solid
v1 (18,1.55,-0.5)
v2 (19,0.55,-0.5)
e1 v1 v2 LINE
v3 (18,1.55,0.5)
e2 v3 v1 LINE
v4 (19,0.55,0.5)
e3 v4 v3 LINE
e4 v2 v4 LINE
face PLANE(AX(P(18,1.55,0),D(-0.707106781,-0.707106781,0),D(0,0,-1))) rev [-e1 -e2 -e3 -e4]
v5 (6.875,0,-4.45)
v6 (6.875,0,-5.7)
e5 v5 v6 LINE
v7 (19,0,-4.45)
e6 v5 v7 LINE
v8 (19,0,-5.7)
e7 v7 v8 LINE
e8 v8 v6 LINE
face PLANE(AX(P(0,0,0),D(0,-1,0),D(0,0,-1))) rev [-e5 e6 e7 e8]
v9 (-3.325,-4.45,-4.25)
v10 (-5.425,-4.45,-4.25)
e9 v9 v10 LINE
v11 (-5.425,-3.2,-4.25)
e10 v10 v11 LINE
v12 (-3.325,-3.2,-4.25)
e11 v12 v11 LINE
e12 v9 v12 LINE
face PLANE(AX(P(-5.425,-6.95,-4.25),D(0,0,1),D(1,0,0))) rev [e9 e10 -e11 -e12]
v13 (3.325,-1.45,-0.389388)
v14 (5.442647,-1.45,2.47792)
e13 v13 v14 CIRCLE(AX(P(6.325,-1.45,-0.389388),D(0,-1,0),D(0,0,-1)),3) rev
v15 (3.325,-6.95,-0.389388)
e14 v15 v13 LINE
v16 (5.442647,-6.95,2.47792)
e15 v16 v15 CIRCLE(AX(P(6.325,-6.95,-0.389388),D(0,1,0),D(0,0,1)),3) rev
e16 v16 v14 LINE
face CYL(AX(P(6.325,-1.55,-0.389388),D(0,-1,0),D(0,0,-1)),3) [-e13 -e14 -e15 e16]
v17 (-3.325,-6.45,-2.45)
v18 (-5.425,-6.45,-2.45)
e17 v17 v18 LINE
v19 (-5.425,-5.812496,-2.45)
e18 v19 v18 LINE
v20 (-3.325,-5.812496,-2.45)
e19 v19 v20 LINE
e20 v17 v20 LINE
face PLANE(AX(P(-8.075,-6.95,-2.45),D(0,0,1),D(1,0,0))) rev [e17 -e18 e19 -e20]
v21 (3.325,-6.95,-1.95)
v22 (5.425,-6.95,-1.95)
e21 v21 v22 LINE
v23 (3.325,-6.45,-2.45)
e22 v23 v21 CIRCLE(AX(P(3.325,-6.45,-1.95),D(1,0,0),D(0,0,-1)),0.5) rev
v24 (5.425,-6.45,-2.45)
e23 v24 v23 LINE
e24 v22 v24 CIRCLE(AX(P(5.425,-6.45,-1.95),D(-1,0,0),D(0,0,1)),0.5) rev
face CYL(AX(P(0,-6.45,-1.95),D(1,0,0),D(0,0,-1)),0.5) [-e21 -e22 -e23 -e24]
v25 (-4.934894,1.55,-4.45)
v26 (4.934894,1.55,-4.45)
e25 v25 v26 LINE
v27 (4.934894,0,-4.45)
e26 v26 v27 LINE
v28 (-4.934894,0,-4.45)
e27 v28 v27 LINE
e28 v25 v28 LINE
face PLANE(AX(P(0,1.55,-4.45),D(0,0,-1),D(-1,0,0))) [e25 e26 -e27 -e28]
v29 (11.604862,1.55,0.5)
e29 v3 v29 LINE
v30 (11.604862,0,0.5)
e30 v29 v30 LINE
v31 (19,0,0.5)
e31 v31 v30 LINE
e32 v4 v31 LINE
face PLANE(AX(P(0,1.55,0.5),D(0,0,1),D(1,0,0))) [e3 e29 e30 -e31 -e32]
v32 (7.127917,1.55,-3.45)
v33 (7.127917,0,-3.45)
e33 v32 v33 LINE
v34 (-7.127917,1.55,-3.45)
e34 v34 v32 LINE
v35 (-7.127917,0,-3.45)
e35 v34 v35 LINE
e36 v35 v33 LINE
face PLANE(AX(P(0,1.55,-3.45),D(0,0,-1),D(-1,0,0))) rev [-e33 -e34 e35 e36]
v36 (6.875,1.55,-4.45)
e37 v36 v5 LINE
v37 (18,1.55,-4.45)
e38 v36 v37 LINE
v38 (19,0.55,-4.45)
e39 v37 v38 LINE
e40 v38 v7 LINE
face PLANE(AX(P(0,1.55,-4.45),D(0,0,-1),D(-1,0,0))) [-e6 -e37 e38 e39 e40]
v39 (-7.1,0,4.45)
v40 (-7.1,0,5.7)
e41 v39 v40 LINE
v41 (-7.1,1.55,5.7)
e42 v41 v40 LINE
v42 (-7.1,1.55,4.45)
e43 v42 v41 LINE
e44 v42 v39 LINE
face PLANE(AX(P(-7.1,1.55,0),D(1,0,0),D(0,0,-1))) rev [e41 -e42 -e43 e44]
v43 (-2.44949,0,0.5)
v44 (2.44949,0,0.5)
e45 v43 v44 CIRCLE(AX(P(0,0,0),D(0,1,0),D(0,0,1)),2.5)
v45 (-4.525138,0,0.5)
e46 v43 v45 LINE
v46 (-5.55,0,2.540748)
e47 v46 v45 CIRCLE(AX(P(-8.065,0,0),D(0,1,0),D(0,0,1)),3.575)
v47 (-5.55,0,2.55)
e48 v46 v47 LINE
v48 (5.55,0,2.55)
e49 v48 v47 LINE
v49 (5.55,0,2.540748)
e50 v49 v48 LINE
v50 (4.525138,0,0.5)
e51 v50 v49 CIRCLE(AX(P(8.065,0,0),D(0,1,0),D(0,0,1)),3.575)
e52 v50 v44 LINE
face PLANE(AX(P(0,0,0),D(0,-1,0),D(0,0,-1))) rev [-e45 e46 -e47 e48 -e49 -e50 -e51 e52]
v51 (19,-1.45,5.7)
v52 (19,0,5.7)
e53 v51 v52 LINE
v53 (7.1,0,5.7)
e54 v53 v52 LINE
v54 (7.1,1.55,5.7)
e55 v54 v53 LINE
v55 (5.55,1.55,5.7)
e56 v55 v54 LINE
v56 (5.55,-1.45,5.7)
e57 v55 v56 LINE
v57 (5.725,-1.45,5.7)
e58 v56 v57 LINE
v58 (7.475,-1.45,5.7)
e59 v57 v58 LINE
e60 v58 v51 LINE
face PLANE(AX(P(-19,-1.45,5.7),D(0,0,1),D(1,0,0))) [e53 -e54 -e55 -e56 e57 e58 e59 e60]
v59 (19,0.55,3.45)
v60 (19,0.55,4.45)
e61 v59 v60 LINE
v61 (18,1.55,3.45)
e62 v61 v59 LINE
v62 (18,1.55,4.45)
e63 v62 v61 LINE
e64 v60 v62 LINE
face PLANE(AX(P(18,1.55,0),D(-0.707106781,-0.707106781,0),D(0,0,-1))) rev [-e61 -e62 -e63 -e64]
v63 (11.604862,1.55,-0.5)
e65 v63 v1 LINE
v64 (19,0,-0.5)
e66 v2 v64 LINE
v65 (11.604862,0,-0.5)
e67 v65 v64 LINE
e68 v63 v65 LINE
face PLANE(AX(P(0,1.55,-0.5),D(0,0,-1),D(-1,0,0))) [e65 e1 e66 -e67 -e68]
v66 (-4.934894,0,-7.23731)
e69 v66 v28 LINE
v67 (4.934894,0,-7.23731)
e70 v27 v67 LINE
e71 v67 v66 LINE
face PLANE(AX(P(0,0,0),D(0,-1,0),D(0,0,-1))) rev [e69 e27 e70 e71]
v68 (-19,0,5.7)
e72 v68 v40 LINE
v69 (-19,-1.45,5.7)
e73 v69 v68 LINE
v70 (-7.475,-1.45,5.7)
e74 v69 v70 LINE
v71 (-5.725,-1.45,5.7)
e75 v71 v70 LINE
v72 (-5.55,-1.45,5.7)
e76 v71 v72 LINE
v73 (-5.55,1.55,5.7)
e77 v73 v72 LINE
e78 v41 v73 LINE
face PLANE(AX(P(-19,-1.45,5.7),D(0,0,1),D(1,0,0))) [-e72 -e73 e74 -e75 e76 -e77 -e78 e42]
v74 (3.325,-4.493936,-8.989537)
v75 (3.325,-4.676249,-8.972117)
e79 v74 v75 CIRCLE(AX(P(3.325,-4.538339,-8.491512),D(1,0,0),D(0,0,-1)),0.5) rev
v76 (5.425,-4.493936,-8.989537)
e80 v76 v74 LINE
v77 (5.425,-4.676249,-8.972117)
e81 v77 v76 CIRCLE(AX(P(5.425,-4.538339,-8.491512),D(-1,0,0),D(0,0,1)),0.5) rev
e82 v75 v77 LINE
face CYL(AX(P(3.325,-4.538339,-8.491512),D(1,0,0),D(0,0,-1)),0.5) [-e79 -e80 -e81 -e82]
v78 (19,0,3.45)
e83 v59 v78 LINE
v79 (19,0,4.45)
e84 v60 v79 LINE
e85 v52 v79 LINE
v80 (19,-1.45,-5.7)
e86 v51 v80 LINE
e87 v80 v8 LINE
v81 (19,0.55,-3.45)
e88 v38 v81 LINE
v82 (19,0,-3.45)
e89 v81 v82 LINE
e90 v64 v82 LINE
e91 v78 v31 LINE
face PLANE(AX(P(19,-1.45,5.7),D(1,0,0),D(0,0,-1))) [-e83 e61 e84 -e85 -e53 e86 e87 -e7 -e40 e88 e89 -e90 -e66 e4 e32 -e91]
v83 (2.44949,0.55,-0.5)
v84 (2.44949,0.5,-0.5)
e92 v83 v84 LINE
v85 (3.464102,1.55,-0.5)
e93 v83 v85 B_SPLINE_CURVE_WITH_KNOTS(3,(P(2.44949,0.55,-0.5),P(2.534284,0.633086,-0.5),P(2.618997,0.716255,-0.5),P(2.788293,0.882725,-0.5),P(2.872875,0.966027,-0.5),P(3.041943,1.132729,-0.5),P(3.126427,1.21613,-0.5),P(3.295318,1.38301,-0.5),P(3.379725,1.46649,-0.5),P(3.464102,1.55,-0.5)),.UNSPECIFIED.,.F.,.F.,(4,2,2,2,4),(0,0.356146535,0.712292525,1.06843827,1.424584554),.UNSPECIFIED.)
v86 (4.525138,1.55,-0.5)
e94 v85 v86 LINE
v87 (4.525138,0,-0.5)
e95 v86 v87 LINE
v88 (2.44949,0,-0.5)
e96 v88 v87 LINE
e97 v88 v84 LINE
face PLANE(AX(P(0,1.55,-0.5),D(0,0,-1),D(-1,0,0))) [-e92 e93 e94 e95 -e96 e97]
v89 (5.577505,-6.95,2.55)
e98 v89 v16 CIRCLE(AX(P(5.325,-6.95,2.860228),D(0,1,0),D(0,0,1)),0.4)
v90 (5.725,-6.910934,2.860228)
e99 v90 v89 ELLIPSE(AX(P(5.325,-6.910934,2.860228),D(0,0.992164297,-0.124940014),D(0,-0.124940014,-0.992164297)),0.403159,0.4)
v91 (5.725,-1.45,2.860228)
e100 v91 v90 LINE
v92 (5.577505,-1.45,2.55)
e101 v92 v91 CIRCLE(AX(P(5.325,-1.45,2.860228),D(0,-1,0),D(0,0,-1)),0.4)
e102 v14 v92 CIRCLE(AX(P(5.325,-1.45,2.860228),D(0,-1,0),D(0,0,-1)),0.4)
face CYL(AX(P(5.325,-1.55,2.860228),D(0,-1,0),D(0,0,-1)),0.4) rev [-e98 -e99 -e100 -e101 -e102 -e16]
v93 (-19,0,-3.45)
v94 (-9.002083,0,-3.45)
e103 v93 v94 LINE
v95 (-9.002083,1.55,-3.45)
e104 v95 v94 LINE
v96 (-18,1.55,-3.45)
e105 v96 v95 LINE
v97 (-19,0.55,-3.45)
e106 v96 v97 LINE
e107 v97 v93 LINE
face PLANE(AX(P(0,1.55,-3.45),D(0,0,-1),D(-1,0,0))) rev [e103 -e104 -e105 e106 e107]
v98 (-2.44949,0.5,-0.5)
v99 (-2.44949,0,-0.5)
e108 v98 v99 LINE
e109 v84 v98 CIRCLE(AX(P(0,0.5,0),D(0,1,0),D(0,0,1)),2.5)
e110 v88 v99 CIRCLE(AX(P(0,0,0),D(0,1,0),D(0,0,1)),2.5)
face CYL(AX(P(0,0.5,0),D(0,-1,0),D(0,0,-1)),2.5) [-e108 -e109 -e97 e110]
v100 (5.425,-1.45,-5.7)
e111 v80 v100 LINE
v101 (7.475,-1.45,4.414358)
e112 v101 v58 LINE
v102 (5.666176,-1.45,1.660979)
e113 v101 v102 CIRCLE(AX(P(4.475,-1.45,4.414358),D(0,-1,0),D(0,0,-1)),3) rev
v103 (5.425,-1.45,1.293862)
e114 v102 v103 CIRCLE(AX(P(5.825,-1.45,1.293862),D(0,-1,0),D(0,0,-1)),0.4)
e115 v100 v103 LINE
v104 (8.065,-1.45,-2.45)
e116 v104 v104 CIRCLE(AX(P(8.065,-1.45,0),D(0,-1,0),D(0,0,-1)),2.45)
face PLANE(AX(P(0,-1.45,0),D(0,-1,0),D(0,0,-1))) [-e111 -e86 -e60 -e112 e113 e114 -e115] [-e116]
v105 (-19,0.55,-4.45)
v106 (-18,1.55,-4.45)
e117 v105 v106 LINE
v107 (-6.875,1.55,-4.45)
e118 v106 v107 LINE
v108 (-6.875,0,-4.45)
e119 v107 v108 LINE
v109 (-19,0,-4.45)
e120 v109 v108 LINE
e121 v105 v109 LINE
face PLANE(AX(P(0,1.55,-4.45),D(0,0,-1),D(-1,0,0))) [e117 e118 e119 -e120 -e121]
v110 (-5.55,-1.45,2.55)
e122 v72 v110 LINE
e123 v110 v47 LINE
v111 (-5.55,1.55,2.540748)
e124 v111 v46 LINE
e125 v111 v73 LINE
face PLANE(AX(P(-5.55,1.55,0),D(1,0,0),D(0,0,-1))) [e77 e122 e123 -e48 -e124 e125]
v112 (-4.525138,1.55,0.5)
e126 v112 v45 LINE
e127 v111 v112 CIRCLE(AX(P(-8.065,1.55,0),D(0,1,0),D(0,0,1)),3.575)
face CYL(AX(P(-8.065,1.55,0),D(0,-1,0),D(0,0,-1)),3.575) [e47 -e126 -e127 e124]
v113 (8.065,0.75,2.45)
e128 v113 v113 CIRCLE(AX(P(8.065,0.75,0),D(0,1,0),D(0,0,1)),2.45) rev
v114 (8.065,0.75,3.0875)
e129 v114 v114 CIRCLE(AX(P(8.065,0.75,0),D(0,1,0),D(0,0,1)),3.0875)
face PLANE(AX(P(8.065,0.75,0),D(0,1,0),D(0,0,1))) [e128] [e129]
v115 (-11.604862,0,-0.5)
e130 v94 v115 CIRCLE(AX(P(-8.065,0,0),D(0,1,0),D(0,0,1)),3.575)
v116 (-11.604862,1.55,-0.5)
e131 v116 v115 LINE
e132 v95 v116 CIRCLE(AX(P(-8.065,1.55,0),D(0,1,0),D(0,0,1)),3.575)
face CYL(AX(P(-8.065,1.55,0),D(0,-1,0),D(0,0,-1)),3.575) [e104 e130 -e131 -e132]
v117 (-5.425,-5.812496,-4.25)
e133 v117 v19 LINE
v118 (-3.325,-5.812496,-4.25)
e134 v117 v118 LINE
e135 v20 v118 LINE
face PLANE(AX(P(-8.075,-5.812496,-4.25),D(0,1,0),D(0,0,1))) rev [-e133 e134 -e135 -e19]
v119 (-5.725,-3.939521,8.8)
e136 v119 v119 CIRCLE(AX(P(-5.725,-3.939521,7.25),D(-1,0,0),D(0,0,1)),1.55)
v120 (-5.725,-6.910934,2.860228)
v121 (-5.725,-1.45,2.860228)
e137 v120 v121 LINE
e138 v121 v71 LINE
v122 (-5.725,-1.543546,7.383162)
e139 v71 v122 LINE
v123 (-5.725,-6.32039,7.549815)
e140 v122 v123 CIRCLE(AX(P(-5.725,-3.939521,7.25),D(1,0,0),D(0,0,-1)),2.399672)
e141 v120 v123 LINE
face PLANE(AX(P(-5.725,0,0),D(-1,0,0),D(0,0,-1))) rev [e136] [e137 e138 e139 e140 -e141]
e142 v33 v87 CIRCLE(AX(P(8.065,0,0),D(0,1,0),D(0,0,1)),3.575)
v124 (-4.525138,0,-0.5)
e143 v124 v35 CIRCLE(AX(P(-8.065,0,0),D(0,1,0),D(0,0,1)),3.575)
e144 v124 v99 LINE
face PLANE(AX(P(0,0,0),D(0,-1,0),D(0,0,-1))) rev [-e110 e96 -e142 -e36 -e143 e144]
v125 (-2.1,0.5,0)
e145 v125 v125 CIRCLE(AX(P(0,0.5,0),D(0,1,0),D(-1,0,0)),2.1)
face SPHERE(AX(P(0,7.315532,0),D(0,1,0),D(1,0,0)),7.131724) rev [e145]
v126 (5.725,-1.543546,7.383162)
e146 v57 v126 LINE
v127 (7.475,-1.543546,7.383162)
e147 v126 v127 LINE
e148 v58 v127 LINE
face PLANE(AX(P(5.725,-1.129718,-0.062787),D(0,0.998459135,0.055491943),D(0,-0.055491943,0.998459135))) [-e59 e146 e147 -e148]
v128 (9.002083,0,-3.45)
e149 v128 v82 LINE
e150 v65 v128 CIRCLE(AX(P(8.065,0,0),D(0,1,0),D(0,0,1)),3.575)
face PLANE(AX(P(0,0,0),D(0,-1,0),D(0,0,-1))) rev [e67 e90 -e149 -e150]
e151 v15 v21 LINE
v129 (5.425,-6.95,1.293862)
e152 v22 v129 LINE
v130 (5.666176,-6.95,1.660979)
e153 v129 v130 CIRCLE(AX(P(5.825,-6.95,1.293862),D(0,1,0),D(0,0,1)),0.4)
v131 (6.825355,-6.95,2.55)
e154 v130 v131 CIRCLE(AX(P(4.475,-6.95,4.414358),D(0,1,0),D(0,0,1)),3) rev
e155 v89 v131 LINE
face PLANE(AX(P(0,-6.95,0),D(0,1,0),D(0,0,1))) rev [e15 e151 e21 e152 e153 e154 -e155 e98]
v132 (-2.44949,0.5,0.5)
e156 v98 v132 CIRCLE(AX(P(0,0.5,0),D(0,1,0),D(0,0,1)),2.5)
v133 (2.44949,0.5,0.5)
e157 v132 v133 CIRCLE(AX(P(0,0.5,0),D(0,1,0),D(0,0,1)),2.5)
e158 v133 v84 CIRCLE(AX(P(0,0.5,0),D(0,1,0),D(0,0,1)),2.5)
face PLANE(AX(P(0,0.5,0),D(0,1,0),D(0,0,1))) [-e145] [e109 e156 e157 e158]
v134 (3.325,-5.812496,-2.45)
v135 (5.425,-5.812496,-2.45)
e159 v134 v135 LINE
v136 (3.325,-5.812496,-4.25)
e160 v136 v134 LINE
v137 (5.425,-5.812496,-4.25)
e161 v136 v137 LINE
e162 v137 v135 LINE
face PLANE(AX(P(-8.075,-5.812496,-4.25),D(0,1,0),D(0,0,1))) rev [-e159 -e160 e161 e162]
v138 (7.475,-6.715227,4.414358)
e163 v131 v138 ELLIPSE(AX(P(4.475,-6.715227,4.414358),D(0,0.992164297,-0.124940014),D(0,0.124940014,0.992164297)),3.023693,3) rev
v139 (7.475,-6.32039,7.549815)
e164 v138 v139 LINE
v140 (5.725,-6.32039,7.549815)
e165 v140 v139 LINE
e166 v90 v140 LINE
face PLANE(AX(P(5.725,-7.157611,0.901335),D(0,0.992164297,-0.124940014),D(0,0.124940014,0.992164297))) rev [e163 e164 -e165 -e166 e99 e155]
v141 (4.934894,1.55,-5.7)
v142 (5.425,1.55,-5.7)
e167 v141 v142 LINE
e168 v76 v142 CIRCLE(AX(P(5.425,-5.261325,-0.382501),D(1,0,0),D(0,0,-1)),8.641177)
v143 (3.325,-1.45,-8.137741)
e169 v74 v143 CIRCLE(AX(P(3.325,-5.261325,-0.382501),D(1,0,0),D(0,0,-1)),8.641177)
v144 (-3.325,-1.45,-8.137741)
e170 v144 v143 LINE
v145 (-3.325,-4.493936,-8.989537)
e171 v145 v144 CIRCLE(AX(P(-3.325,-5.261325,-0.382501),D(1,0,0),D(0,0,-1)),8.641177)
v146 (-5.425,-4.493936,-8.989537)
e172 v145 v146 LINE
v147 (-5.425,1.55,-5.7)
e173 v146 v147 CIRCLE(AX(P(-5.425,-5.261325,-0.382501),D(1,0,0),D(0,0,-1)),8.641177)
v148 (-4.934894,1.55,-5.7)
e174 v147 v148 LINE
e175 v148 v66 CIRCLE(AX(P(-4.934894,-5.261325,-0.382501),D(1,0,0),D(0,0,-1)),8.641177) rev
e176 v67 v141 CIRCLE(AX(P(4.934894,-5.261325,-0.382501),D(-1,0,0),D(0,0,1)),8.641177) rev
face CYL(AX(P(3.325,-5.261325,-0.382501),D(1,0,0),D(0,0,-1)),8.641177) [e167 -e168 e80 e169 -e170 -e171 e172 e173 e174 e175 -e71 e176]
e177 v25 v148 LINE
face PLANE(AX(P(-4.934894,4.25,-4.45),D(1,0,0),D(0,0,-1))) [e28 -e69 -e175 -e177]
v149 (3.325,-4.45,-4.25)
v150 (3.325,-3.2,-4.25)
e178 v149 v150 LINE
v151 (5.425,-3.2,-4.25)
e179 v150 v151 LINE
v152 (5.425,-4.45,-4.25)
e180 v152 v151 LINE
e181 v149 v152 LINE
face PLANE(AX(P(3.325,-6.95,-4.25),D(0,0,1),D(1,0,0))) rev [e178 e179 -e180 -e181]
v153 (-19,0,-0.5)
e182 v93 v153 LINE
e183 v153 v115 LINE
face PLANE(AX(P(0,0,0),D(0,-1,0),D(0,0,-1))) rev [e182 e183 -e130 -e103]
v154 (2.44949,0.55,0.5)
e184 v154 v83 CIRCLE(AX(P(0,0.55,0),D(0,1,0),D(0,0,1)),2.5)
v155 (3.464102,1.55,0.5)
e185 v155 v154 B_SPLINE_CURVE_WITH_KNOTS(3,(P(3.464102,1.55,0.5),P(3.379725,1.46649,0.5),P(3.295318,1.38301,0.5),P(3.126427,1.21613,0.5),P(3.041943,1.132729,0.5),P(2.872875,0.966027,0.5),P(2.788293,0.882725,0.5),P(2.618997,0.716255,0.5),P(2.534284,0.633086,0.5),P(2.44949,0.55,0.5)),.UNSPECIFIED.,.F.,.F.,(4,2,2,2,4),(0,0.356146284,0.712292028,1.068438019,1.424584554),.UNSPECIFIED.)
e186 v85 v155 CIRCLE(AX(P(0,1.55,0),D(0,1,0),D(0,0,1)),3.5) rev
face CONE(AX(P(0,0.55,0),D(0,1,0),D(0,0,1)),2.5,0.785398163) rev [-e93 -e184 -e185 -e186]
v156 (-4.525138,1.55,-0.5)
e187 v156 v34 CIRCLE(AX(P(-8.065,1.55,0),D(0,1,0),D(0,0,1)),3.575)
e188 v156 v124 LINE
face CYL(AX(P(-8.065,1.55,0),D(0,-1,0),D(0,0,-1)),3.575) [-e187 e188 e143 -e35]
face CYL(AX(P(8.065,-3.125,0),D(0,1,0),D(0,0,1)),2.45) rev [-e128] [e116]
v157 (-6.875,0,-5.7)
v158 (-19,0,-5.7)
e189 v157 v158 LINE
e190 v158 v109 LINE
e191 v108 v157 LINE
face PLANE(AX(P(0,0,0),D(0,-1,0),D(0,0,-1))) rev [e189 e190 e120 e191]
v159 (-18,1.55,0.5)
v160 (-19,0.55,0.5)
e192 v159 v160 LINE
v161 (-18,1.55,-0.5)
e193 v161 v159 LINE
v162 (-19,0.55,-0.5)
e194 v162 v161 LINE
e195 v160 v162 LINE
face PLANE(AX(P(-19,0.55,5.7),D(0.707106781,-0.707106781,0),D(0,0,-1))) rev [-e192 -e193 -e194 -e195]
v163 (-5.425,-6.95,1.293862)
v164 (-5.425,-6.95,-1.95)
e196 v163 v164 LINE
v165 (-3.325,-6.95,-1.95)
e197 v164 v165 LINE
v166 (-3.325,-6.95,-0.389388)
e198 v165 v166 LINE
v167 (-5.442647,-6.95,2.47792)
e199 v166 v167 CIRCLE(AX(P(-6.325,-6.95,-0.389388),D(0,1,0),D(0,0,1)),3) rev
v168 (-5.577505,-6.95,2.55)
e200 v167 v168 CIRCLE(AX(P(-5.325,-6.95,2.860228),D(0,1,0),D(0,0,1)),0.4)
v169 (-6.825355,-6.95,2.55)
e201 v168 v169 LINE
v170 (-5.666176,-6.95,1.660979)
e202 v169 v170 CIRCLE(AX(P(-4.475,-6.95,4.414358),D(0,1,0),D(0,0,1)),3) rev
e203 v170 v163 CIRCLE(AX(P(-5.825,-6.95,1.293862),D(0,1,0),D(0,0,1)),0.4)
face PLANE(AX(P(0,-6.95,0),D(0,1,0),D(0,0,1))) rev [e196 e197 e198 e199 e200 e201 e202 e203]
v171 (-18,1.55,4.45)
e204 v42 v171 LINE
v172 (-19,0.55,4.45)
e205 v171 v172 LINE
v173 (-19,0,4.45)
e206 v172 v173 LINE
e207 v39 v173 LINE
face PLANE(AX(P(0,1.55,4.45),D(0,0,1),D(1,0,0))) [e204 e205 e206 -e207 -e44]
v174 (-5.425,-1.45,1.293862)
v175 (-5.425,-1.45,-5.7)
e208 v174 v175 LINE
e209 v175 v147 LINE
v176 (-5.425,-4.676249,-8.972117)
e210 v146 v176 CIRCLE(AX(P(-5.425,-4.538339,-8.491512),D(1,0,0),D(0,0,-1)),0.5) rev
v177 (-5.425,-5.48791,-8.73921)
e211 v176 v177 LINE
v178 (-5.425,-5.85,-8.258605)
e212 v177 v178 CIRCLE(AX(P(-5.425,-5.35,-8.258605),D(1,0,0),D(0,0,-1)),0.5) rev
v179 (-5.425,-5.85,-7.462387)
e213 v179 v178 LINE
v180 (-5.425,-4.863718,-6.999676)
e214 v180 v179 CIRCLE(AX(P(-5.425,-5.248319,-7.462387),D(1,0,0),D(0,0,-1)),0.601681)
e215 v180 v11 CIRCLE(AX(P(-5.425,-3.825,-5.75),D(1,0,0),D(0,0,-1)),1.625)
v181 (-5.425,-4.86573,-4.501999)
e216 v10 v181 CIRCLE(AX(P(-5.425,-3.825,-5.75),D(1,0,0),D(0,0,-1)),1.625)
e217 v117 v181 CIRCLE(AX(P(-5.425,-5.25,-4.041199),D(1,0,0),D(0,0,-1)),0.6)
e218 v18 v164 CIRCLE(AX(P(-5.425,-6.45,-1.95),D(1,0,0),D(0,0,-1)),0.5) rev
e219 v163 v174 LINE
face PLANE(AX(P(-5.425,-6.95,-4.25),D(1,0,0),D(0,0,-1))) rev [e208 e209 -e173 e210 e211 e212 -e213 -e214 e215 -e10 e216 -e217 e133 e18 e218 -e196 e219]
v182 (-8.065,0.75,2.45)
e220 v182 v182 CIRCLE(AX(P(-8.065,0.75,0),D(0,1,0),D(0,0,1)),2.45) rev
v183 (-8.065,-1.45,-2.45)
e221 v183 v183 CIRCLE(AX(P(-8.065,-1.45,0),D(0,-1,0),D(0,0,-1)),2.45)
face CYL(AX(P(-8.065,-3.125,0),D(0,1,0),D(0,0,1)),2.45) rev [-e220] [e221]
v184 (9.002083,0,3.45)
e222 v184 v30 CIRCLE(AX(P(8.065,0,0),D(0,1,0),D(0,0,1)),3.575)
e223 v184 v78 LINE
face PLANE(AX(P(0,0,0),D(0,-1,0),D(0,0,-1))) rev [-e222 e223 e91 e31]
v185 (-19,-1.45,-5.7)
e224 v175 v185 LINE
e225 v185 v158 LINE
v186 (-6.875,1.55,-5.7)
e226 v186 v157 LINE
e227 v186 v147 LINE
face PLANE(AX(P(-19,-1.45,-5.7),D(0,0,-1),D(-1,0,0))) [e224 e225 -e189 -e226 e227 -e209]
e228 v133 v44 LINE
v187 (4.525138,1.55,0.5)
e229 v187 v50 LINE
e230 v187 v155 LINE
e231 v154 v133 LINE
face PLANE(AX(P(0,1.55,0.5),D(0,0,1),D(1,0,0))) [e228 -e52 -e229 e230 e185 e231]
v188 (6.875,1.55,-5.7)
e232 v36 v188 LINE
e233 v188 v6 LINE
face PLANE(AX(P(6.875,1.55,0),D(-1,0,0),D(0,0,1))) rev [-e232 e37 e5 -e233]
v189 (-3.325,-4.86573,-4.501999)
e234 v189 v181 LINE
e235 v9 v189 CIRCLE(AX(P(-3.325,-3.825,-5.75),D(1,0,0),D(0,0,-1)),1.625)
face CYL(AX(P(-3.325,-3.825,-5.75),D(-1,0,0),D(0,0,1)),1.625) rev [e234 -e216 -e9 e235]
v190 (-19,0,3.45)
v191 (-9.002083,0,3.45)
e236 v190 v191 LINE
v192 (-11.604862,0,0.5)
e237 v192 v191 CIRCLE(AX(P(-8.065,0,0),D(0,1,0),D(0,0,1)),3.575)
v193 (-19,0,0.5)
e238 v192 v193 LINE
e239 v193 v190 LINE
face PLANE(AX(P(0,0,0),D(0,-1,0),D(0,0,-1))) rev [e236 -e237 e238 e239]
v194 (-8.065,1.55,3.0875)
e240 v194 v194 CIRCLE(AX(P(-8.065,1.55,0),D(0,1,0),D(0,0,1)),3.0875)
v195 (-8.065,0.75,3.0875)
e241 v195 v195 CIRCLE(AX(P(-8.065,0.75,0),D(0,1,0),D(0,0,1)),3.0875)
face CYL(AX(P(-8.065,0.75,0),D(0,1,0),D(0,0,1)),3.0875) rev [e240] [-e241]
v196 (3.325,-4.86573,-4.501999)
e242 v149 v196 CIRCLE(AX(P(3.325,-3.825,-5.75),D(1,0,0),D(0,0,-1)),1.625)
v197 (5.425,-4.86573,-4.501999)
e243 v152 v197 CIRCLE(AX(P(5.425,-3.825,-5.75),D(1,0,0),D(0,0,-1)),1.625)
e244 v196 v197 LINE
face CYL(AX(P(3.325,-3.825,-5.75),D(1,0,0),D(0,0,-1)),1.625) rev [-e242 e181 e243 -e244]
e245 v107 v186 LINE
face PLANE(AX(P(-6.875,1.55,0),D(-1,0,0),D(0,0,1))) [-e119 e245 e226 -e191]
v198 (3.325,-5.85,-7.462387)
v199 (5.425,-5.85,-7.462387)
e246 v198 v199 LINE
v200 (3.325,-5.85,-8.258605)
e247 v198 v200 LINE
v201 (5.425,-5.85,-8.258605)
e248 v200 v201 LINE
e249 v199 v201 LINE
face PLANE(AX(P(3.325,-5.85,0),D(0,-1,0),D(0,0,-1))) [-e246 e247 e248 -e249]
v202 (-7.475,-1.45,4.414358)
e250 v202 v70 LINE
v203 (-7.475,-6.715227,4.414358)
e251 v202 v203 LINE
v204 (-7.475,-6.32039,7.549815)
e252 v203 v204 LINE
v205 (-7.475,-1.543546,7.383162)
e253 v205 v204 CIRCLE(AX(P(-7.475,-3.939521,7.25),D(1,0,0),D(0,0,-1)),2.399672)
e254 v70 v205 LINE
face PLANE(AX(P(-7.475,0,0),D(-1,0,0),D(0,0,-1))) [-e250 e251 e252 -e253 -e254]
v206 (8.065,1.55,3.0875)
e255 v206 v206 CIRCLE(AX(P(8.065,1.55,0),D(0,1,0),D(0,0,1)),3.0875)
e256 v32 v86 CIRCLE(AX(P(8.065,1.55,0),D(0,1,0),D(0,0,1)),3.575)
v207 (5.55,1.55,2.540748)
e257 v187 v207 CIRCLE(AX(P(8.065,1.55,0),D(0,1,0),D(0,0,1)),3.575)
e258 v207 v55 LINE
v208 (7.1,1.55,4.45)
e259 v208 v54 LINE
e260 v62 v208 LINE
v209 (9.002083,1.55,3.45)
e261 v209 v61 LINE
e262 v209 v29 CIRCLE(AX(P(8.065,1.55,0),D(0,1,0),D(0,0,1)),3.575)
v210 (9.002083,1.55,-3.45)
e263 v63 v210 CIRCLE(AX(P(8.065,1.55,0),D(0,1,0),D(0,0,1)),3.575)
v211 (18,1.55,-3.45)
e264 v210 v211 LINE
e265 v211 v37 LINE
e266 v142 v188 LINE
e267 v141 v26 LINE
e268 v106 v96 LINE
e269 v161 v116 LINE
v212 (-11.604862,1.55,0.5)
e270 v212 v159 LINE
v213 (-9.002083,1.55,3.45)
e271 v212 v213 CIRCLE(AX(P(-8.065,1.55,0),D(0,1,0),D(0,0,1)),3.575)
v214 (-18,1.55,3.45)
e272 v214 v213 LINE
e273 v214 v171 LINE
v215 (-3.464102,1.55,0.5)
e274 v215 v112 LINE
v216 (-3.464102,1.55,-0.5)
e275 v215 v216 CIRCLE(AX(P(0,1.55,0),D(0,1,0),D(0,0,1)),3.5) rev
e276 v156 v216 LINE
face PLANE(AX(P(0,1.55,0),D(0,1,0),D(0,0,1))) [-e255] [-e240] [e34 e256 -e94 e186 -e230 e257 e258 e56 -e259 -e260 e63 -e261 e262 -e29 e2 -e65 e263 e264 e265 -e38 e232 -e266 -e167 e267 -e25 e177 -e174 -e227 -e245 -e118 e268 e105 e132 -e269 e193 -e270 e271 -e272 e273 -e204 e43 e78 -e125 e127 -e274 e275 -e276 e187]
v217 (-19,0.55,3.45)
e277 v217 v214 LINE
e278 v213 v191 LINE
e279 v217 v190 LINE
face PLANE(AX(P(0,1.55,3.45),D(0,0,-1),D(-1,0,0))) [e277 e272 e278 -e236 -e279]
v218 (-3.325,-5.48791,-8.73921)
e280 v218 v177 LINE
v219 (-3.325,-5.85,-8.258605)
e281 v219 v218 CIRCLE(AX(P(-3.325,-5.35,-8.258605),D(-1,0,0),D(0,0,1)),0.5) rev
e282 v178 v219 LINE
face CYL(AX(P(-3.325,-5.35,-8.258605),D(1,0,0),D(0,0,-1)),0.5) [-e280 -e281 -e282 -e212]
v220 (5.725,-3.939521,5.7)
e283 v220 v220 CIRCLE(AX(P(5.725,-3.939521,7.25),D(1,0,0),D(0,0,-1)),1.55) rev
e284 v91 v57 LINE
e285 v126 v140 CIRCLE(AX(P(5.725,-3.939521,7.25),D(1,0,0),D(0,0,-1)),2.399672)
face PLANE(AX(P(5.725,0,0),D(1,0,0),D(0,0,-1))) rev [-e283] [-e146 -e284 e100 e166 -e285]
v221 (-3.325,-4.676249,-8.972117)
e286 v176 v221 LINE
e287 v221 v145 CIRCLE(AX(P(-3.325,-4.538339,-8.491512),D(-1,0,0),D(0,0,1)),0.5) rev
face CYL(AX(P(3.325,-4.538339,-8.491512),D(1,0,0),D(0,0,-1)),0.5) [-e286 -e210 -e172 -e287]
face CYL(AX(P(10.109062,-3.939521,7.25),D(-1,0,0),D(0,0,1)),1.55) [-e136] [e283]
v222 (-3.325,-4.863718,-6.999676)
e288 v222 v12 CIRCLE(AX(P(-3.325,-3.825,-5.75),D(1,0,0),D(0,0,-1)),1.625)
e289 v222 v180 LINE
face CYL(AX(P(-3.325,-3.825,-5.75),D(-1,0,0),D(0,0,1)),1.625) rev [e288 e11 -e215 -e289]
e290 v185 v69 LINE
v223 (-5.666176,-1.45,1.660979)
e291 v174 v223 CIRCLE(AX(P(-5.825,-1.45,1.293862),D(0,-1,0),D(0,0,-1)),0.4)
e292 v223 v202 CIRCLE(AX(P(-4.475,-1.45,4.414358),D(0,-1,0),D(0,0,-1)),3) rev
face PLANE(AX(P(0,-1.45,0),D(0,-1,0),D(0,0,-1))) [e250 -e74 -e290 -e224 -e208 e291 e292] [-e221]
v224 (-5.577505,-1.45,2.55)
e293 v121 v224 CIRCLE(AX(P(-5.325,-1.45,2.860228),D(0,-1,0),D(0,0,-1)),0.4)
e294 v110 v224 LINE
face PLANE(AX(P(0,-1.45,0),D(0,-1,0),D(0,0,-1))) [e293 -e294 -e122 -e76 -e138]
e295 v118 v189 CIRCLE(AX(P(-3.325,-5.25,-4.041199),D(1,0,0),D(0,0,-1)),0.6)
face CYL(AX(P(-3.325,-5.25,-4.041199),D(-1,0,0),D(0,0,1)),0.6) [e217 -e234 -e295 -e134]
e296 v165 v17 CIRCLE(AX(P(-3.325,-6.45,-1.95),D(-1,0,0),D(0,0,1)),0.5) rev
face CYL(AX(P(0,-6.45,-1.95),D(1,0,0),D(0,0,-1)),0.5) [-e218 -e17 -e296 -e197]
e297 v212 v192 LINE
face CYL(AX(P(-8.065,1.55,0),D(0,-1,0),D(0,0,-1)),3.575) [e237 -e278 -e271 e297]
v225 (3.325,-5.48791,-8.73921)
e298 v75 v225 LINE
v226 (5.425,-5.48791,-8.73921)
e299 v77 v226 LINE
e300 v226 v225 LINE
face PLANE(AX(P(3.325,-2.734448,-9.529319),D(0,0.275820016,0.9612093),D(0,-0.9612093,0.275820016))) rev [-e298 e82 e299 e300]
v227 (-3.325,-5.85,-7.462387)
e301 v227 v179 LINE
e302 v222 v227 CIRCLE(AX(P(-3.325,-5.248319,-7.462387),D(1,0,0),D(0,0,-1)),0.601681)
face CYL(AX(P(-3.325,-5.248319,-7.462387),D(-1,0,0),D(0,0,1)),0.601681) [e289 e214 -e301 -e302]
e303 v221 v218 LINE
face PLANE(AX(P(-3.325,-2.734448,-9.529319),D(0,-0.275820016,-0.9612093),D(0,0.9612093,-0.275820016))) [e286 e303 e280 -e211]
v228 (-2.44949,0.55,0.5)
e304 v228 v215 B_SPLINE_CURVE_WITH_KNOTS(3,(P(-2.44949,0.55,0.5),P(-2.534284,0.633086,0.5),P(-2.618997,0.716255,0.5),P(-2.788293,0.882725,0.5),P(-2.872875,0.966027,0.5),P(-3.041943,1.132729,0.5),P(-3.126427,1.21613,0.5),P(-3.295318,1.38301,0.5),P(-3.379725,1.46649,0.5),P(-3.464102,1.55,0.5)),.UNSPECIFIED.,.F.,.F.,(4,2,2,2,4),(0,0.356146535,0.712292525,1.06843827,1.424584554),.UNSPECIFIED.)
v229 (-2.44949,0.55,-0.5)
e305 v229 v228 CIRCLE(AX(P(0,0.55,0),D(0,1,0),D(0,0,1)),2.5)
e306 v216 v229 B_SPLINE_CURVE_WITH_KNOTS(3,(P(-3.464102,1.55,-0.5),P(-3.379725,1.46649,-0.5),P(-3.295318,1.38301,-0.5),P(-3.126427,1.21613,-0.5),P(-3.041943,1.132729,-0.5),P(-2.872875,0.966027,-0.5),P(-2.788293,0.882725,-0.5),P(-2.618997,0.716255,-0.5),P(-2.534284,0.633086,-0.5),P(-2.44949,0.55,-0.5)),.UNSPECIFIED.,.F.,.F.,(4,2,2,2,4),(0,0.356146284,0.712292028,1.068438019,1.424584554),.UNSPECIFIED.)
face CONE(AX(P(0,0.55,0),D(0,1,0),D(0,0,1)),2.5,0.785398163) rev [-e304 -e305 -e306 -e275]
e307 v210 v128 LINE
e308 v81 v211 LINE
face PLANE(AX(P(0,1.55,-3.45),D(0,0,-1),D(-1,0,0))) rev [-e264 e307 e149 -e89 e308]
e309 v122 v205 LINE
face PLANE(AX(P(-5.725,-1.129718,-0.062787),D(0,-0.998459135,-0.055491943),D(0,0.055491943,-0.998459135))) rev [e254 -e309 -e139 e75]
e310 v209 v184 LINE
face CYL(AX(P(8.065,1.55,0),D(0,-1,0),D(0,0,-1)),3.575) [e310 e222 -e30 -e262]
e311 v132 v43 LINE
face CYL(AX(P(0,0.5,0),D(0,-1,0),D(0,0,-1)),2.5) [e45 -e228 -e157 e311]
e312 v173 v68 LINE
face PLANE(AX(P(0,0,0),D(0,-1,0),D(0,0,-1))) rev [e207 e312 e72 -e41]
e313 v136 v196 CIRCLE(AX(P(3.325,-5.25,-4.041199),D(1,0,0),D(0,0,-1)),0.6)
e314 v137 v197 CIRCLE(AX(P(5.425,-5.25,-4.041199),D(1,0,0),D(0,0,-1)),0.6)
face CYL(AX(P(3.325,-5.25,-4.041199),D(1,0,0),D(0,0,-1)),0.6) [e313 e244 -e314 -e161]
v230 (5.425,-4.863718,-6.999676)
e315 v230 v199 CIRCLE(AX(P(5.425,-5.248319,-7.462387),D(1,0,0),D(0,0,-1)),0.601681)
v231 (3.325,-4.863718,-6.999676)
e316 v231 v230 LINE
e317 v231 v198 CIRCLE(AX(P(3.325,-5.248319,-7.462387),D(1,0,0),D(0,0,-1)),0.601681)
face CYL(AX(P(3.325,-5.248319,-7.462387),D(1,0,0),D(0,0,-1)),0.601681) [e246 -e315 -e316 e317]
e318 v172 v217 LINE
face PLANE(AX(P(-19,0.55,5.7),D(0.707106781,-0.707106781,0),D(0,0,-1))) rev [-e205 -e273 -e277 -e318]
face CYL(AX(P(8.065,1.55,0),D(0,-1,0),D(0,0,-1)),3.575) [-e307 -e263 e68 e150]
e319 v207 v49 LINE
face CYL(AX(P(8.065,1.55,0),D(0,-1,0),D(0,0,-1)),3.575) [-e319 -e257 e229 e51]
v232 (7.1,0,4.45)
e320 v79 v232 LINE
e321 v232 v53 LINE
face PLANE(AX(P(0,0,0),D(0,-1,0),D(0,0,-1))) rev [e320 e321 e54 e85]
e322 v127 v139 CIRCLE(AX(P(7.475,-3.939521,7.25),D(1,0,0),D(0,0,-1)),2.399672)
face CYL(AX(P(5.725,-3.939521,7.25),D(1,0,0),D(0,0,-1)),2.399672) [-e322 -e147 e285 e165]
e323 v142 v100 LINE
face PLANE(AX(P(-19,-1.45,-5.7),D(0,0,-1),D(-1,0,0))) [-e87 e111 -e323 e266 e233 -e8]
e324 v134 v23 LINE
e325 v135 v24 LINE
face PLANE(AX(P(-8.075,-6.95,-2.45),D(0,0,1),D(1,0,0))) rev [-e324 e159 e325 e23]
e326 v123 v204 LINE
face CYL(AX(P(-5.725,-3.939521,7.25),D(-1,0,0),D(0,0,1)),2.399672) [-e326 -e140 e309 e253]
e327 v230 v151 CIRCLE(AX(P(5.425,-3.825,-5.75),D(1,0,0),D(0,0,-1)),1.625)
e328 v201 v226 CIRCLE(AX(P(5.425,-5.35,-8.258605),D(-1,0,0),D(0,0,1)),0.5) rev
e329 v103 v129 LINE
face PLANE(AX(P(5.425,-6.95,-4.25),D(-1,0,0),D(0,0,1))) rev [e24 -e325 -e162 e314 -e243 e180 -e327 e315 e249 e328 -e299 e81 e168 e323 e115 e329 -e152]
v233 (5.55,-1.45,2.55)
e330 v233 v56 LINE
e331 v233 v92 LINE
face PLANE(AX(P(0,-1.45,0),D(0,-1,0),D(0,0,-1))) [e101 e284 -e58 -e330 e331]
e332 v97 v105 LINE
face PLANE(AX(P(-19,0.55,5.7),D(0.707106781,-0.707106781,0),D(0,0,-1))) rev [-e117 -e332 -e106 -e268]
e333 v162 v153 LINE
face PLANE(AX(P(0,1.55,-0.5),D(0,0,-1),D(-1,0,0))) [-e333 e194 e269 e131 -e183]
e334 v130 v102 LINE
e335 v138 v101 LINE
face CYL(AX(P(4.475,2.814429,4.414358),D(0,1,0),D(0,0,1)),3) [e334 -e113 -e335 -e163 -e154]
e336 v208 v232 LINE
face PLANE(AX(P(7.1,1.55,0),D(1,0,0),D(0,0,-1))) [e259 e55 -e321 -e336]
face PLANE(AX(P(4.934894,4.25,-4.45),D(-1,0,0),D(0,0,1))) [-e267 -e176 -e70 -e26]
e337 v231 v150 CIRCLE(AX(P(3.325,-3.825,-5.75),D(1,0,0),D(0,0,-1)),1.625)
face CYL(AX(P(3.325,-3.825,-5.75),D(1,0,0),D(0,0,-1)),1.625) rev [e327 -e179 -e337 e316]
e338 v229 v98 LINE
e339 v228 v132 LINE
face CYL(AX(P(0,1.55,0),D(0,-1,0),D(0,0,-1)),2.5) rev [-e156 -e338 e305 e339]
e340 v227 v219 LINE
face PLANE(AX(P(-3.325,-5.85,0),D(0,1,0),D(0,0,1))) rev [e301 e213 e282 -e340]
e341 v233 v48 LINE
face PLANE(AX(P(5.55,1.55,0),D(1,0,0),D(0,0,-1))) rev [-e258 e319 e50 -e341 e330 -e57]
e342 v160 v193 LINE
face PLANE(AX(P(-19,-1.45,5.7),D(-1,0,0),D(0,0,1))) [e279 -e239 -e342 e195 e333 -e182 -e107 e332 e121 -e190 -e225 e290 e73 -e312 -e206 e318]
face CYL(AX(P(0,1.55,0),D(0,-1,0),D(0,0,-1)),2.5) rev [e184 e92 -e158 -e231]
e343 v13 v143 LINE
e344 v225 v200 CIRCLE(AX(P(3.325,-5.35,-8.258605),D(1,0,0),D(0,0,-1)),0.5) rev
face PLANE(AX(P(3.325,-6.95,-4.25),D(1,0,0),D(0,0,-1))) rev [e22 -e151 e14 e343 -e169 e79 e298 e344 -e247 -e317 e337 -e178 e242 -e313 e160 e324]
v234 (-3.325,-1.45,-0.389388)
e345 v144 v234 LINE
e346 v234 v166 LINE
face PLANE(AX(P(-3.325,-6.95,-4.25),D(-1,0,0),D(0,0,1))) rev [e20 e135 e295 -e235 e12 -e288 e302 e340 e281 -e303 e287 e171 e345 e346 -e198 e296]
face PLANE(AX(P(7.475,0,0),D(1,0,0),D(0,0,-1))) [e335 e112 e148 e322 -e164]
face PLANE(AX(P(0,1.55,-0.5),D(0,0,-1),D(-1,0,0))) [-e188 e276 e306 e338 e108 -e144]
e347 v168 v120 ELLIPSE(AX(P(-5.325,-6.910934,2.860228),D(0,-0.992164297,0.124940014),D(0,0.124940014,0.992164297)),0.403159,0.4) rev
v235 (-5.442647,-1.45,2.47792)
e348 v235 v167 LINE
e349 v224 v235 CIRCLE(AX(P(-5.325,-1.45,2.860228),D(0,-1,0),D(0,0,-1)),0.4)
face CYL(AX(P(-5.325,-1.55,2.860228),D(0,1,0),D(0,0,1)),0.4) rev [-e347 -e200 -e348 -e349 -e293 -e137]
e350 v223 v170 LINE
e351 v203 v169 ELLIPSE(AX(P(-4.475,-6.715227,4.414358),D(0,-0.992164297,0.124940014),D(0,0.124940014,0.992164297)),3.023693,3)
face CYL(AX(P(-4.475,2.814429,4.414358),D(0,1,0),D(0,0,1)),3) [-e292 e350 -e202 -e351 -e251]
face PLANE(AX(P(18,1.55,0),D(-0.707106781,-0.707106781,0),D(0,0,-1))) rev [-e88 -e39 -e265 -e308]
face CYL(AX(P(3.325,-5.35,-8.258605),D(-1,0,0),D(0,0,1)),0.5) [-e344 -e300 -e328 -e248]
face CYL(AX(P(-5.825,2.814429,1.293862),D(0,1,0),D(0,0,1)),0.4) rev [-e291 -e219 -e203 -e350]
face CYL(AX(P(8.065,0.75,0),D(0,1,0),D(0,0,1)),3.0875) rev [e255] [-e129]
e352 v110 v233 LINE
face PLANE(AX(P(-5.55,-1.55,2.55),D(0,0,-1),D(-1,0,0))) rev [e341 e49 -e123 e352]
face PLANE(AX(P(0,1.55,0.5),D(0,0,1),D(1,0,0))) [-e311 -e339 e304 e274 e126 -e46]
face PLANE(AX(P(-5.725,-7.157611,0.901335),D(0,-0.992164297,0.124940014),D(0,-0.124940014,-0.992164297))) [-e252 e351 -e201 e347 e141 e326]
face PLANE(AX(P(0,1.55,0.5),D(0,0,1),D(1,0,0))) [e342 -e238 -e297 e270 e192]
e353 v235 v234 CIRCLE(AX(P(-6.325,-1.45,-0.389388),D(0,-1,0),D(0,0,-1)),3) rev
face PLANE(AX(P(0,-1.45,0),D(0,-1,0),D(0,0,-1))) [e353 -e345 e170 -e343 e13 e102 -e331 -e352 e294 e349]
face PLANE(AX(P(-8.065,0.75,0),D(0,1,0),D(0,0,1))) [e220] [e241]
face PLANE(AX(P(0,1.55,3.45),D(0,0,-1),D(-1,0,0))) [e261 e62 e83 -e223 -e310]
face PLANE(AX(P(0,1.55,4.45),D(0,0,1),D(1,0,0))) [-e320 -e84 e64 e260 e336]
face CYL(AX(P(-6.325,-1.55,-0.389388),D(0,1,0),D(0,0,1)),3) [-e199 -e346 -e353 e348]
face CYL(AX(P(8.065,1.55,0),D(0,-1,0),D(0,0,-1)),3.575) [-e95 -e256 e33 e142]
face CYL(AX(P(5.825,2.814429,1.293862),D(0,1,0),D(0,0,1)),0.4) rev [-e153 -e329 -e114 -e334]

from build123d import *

# Parameters (mm, degrees)
SKETCH2_W            = 38
SKETCH2_H            = 11.4
BOSS_EXTRUDE1_DEPTH  = 1.45
SKETCH1_R            = 3.0875
BOSS_EXTRUDE2_DEPTH  = 1.55
SKETCH4_W            = 11.1
SKETCH4_H            = 3.15
CUT_EXTRUDE1_DEPTH   = 1.55
SKETCH5_R            = 2.5
BOSS_EXTRUDE3_DEPTH  = 0.5
SKETCH6_W            = 2.1
SKETCH6_H            = 6.8
BOSS_EXTRUDE4_DEPTH  = 5.5
BOSS_EXTRUDE5_DEPTH  = 2.1
SKETCH10_W           = 1.8
SKETCH10_H           = 1.137503558
CUT_EXTRUDE2_DEPTH   = 13.5
BOSS_EXTRUDE6_START  = -3.325
BOSS_EXTRUDE6_DEPTH  = 6.65
SKETCH13_W           = 1.609894421
SKETCH13_H           = 2.787309827
SKETCH13_H_2         = 3.919277545
CUT_EXTRUDE3_DEPTH   = 4.25
SKETCH14_R           = 2.399672092
SKETCH14_R_2         = 1.55
BOSS_EXTRUDE9_DEPTH  = 1.75
SKETCH15_R           = 1.55
BOSS_EXTRUDE10_DEPTH = 13.2
SKETCH19_W           = 4.15
SKETCH19_H           = 0.9812524
BOSS_EXTRUDE11_DEPTH = 5.5
FILLET1_R            = 3
FILLET2_R            = 0.5
CHAMFER1_SIZE        = 1
SKETCH20_R           = 2.45
CUT_EXTRUDE4_DEPTH   = 3.125
SKETCH21_R           = 3.0875
CUT_EXTRUDE5_DEPTH   = 0.8
FILLET5_R            = 0.4


# Read off the part's stored shape, not the designer's step: Boss-Extrude6
with BuildPart() as part:
    # Sketch2 → Boss-Extrude1 (new body)
    with BuildSketch(Plane(origin=(0, 0, 0), x_dir=(1, 0, 0), z_dir=(0, 1, 0))):
        Rectangle(SKETCH2_W, SKETCH2_H)
    extrude(amount=-BOSS_EXTRUDE1_DEPTH)

    # Sketch1 → Boss-Extrude2 (add)
    # profile 1 of 3: a face of its own
    with BuildSketch(Plane(origin=(0, 0, 0), x_dir=(1, 0, 0), z_dir=(0, 1, 0))):
        with BuildLine():
            ThreePointArc((-2.449489743, 0.5), (-2.5, 0), (-2.449489743, -0.5))
            Line((-2.449489743, -0.5), (-4.525137715, -0.5))
            ThreePointArc((-4.525137715, -0.5), (-4.870238296, -1.60440726), (-5.55, -2.540747921))
            Line((-5.55, -2.540747921), (-5.55, -5.7))
            Line((-5.55, -5.7), (-7.1, -5.7))
            Line((-7.1, -5.7), (-7.1, -4.45))
            Line((-7.1, -4.45), (-19, -4.45))
            Line((-19, -4.45), (-19, -3.45))
            Line((-19, -3.45), (-9.002083241, -3.45))
            ThreePointArc((-9.002083241, -3.45), (-10.745743425, -2.365214512), (-11.604862285, -0.5))
            Line((-11.604862285, -0.5), (-19, -0.5))
            Line((-19, -0.5), (-19, 0.5))
            Line((-19, 0.5), (-11.604862285, 0.5))
            ThreePointArc((-11.604862285, 0.5), (-10.745743425, 2.365214512), (-9.002083241, 3.45))
            Line((-9.002083241, 3.45), (-19, 3.45))
            Line((-19, 3.45), (-19, 4.45))
            Line((-19, 4.45), (-6.875, 4.45))
            Line((-6.875, 4.45), (-6.875, 5.7))
            Line((-6.875, 5.7), (-4.975, 5.7))
            Line((-4.975, 5.7), (-4.975, 4.45))
            Line((-4.975, 4.45), (4.975, 4.45))
            Line((4.975, 4.45), (4.975, 5.7))
            Line((4.975, 5.7), (6.875, 5.7))
            Line((6.875, 5.7), (6.875, 4.45))
            Line((6.875, 4.45), (19, 4.45))
            Line((19, 4.45), (19, 3.45))
            Line((19, 3.45), (9.002083241, 3.45))
            ThreePointArc((9.002083241, 3.45), (10.745743425, 2.365214512), (11.604862285, 0.5))
            Line((11.604862285, 0.5), (19, 0.5))
            Line((19, 0.5), (19, -0.5))
            Line((19, -0.5), (11.604862285, -0.5))
            ThreePointArc((11.604862285, -0.5), (10.745743425, -2.365214512), (9.002083241, -3.45))
            Line((9.002083241, -3.45), (19, -3.45))
            Line((19, -3.45), (19, -4.45))
            Line((19, -4.45), (7.1, -4.45))
            Line((7.1, -4.45), (7.1, -5.7))
            Line((7.1, -5.7), (5.55, -5.7))
            Line((5.55, -5.7), (5.55, -2.540747921))
            ThreePointArc((5.55, -2.540747921), (4.870238296, -1.60440726), (4.525137715, -0.5))
            Line((4.525137715, -0.5), (2.449489743, -0.5))
            ThreePointArc((2.449489743, -0.5), (2.5, 0), (2.449489743, 0.5))
            Line((2.449489743, 0.5), (4.525137715, 0.5))
            ThreePointArc((4.525137715, 0.5), (5.384256575, 2.365214512), (7.127916759, 3.45))
            Line((7.127916759, 3.45), (-7.127916759, 3.45))
            ThreePointArc((-7.127916759, 3.45), (-5.384256575, 2.365214512), (-4.525137715, 0.5))
            Line((-4.525137715, 0.5), (-2.449489743, 0.5))
        make_face()
        with Locations((8.065, 0)):
            Circle(SKETCH1_R, mode=Mode.SUBTRACT)
        with Locations((-8.065, 0)):
            Circle(SKETCH1_R, mode=Mode.SUBTRACT)
    # profile 2 of 3: a face of its own
    with BuildSketch(Plane(origin=(0, 0, 0), x_dir=(1, 0, 0), z_dir=(0, 1, 0))):
        with Locations((-8.065, 0)):
            Circle(SKETCH1_R)
    # profile 3 of 3: a face of its own
    with BuildSketch(Plane(origin=(0, 0, 0), x_dir=(1, 0, 0), z_dir=(0, 1, 0))):
        with Locations((8.065, 0)):
            Circle(SKETCH1_R)
    extrude(amount=BOSS_EXTRUDE2_DEPTH)

    # Sketch4 → Cut-Extrude1 (cut)
    with BuildSketch(Plane(origin=(0, 0, 0), x_dir=(1, 0, 0), z_dir=(0, 1, 0))):
        with Locations((0, -4.125)):
            Rectangle(SKETCH4_W, SKETCH4_H)
    extrude(amount=-CUT_EXTRUDE1_DEPTH, mode=Mode.SUBTRACT)

    # Sketch5 → Boss-Extrude3 (add)
    with BuildSketch(Plane(origin=(0, 0, 0), x_dir=(1, 0, 0), z_dir=(0, 1, 0))):
        Circle(SKETCH5_R)
    extrude(amount=BOSS_EXTRUDE3_DEPTH)

    # Sketch6 → Boss-Extrude4 (add)
    with BuildSketch(Plane.XZ.offset(1.45)):
        with Locations((-4.375, -0.85)):
            Rectangle(SKETCH6_W, SKETCH6_H)
        with Locations((4.375, -0.85)):
            Rectangle(SKETCH6_W, SKETCH6_H)
    extrude(amount=BOSS_EXTRUDE4_DEPTH)

    # Sketch8 → Boss-Extrude5 (add)
    with BuildSketch(Plane(origin=(5.425, 0, 0), x_dir=(0, 0, -1), z_dir=(1, 0, 0))):
        with BuildLine():
            Line((3.824457799, 1.55), (3.169391593, -1.45))
            Line((3.169391593, -1.45), (4.25, -1.45))
            Line((4.25, -1.45), (4.25, -3.2))
            ThreePointArc((4.25, -3.2), (6.591222467, -2.434687171), (6.999675652, -4.863718328))
            ThreePointArc((6.999675652, -4.863718328), (6.917672859, -5.503870326), (7.462386809, -5.85))
            Line((7.462386809, -5.85), (8.635307609, -5.85))
            Line((8.635307609, -5.85), (8.99741287, -4.588093961))
            ThreePointArc((8.99741287, -4.588093961), (7.994798141, -1.171963485), (5.7, 1.55))
            Line((5.7, 1.55), (3.824457799, 1.55))
        make_face()
        with BuildLine():
            Line((4.25, -4.45), (4.25, -5.812496442))
            ThreePointArc((4.25, -5.812496442), (4.621012042, -5.404327986), (4.501999453, -4.865730337))
            ThreePointArc((4.501999453, -4.865730337), (4.360365271, -4.667342163), (4.25, -4.45))
        make_face()
    boss_extrude5 = extrude(amount=-BOSS_EXTRUDE5_DEPTH)

    # Sketch10 → Cut-Extrude2 (cut)
    with BuildSketch(Plane(origin=(5.425, 0, 0), x_dir=(0, 0, -1), z_dir=(1, 0, 0))):
        with Locations((3.35, -6.381248221)):
            Rectangle(SKETCH10_W, SKETCH10_H)
    extrude(amount=-CUT_EXTRUDE2_DEPTH, mode=Mode.SUBTRACT)

    # Mirror2: Boss-Extrude5 across plane
    add(boss_extrude5.mirror(Plane(origin=(0, 0, 0), x_dir=(0, 0, 1), z_dir=(1, 0, 0))))

    # Boss-Extrude6 outline → Boss-Extrude6 (add)
    with BuildSketch(Plane.YZ.offset(BOSS_EXTRUDE6_START)):
        with BuildLine():
            Line((0, -5.7), (-1.45, -5.7))
            Line((-1.45, -5.7), (-1.45, -8.137740985))
            ThreePointArc((-1.45, -8.137740985), (-0.702713526, -7.723414198), (0, -7.237309827))
            Line((0, -7.237309827), (0, -5.7))
        make_face()
    extrude(amount=BOSS_EXTRUDE6_DEPTH)

    # Sketch13 → Cut-Extrude3 (cut)
    with BuildSketch(Plane(origin=(0, 0, 0), x_dir=(1, 0, 0), z_dir=(0, 1, 0))):
        with Locations((-4.129947211, 5.843654913)):
            Rectangle(SKETCH13_W, SKETCH13_H)
        with Locations((4.129947211, 6.409638773)):
            Rectangle(SKETCH13_W, SKETCH13_H_2)
    extrude(amount=CUT_EXTRUDE3_DEPTH, mode=Mode.SUBTRACT)

    # Sketch14 → Boss-Extrude9 (add)
    # profile 1 of 3: a face of its own
    with BuildSketch(Plane(origin=(7.475, 0, 0), x_dir=(0, 0, -1), z_dir=(1, 0, 0))):
        with BuildLine():
            Line((-7.549815065, -6.320389595), (-2.55, -6.95))
            Line((-2.55, -6.95), (-1.989793561, -6.95))
            Line((-1.989793561, -6.95), (-1.989793561, -1.45))
            Line((-1.989793561, -1.45), (-2.55, -1.45))
            Line((-2.55, -1.45), (-5.7, -1.45))
            Line((-5.7, -1.45), (-7.383162468, -1.543546098))
            ThreePointArc((-7.383162468, -1.543546098), (-5.60092755, -2.196251792), (-4.850327908, -3.93952062))
            ThreePointArc((-4.850327908, -3.93952062), (-5.662711698, -5.739226706), (-7.549815065, -6.320389595))
        make_face()
    # profile 2 of 3: a face of its own
    with BuildSketch(Plane(origin=(7.475, 0, 0), x_dir=(0, 0, -1), z_dir=(1, 0, 0))):
        with Locations((-7.25, -3.93952062)):
            Circle(SKETCH14_R)
        with Locations((-7.25, -3.93952062)):
            Circle(SKETCH14_R_2, mode=Mode.SUBTRACT)
    # profile 3 of 3: a face of its own
    with BuildSketch(Plane(origin=(7.475, 0, 0), x_dir=(0, 0, -1), z_dir=(1, 0, 0))):
        with Locations((-7.25, -3.93952062)):
            Circle(SKETCH14_R_2)
    boss_extrude9 = extrude(amount=-BOSS_EXTRUDE9_DEPTH)

    # Mirror3: Boss-Extrude9 across plane
    add(boss_extrude9.mirror(Plane(origin=(0, 0, 0), x_dir=(0, 0, 1), z_dir=(1, 0, 0))))

    # Sketch15 → Boss-Extrude10 (add)
    with BuildSketch(Plane.ZY.offset(7.475)):
        with Locations((7.25, -3.93952062)):
            Circle(SKETCH15_R)
    extrude(amount=-BOSS_EXTRUDE10_DEPTH)

    # Sketch17 → Cut-Revolve4 (revolve, cut)
    with BuildSketch(Plane.XY):
        with BuildLine():
            Line((2.1, 0.5), (2.1, 0.710906592))
            Line((2.1, 0.710906592), (0, 1.053607594))
            Line((0, 1.053607594), (0, 0.183808769))
            ThreePointArc((0, 0.183808769), (1.061835309, 0.263299583), (2.1, 0.5))
        make_face()
    revolve(axis=Axis((0, 1.053607594, 0), (0, -1, 0)), mode=Mode.SUBTRACT)

    # Sketch19 → Boss-Extrude11 (add)
    with BuildSketch(Plane.XZ.offset(6.95)):
        with Locations((5.4, 2.0593738)):
            Rectangle(SKETCH19_W, SKETCH19_H)
    boss_extrude11 = extrude(amount=-BOSS_EXTRUDE11_DEPTH)

    # Mirror4: Boss-Extrude11 across plane
    add(boss_extrude11.mirror(Plane(origin=(0, 0, 0), x_dir=(0, 0, 1), z_dir=(1, 0, 0))))

    # Fillet1
    # the kernel refuses this fillet: 3 mm, written as the material it takes off along each edge
    with BuildSketch(Plane(origin=(7.475, -14.064026638, 1.5687476), x_dir=(-1, 0, 0), z_dir=(0, 1, 0))) as fillet1_piece_1:
        with BuildLine():
            CenterArc((3, 2.845610655), FILLET1_R, 180, 71.538541703)
            Line((0, 2.845610655), (0, 0))
            Line((0, 0), (2.05, 0))
        make_face()
    extrude(amount=12.614026638, mode=Mode.SUBTRACT)
    with BuildSketch(Plane(origin=(3.325, -1.45, 2.55), x_dir=(0, 0, -1), z_dir=(0, -1, 0))) as fillet1_piece_2:
        with BuildLine():
            CenterArc((2.939387691, 3), FILLET1_R, 191.536959033, 78.463040967)
            Line((0, 2.4), (0, 0))
            Line((0, 0), (2.939387691, 0))
        make_face()
    extrude(amount=12.848469228, mode=Mode.SUBTRACT)
    with BuildSketch(Plane(origin=(-3.325, -1.45, 2.55), x_dir=(0, 0, -1), z_dir=(0, -1, 0))) as fillet1_piece_3:
        with BuildLine():
            CenterArc((2.939387691, -3), FILLET1_R, 90, 78.463040967)
            Line((0, -2.4), (0, 0))
            Line((0, 0), (2.939387691, 0))
        make_face()
    extrude(amount=12.848469228, mode=Mode.SUBTRACT)
    with BuildSketch(Plane(origin=(-7.475, -14.064026638, 1.5687476), x_dir=(0, 0, 1), z_dir=(0, 1, 0))) as fillet1_piece_4:
        with BuildLine():
            CenterArc((2.845610655, 3), FILLET1_R, 198.461458297, 71.538541703)
            Line((0, 2.05), (0, 0))
            Line((0, 0), (2.845610655, 0))
        make_face()
    extrude(amount=12.614026638, mode=Mode.SUBTRACT)

    # Fillet2
    fillet2_edges = [part.edges().sort_by_distance(p)[0] for p in [
        (4.375, -4.588093961, -8.99741287),
        (4.375, -5.85, -8.635307609),
        (4.375, -6.95, -2.45),
        (-4.375, -6.95, -2.45),
        (-4.375, -5.85, -8.635307609),
        (-4.375, -4.588093961, -8.99741287),
    ]]
    fillet(fillet2_edges, radius=FILLET2_R)

    # Chamfer1
    chamfer1_edges = [part.edges().sort_by_distance(p)[0] for p in [
        (-2.5, 1.55, 0),
        (2.5, 1.55, 0),
        (-19, 1.55, -3.95),
        (-19, 1.55, 0),
        (-19, 1.55, 3.95),
        (19, 1.55, 3.95),
        (19, 1.55, 0),
        (19, 1.55, -3.95),
    ]]
    chamfer(chamfer1_edges, length=CHAMFER1_SIZE)

    # Sketch20 → Cut-Extrude4 (cut, symmetric)
    with BuildSketch(Plane(origin=(0, 0, 0), x_dir=(1, 0, 0), z_dir=(0, 1, 0))):
        with Locations(Location((-8.065, 0, 0), (0, 0, 270))):
            Circle(SKETCH20_R)
        with Locations(Location((8.065, 0, 0), (0, 0, 270))):
            Circle(SKETCH20_R)
    extrude(amount=CUT_EXTRUDE4_DEPTH, both=True, mode=Mode.SUBTRACT)

    # Sketch21 → Cut-Extrude5 (cut)
    with BuildSketch(Plane(origin=(0, 1.55, 0), x_dir=(1, 0, 0), z_dir=(0, 1, 0))):
        with Locations(Location((-8.065, 0, 0), (0, 0, 270))):
            Circle(SKETCH21_R)
        with Locations(Location((8.065, 0, 0), (0, 0, 270))):
            Circle(SKETCH21_R)
    extrude(amount=-CUT_EXTRUDE5_DEPTH, mode=Mode.SUBTRACT)

    # Fillet5
    fillet5_edges = [part.edges().sort_by_distance(p)[0] for p in [
        (5.425, -4.2, 1.5687476),
        (-5.425, -4.2, 1.5687476),
        (-5.725, -4.2, 2.55),
        (5.725, -4.2, 2.55),
    ]]
    fillet(fillet5_edges, radius=FILLET5_R)


solid = part.part
